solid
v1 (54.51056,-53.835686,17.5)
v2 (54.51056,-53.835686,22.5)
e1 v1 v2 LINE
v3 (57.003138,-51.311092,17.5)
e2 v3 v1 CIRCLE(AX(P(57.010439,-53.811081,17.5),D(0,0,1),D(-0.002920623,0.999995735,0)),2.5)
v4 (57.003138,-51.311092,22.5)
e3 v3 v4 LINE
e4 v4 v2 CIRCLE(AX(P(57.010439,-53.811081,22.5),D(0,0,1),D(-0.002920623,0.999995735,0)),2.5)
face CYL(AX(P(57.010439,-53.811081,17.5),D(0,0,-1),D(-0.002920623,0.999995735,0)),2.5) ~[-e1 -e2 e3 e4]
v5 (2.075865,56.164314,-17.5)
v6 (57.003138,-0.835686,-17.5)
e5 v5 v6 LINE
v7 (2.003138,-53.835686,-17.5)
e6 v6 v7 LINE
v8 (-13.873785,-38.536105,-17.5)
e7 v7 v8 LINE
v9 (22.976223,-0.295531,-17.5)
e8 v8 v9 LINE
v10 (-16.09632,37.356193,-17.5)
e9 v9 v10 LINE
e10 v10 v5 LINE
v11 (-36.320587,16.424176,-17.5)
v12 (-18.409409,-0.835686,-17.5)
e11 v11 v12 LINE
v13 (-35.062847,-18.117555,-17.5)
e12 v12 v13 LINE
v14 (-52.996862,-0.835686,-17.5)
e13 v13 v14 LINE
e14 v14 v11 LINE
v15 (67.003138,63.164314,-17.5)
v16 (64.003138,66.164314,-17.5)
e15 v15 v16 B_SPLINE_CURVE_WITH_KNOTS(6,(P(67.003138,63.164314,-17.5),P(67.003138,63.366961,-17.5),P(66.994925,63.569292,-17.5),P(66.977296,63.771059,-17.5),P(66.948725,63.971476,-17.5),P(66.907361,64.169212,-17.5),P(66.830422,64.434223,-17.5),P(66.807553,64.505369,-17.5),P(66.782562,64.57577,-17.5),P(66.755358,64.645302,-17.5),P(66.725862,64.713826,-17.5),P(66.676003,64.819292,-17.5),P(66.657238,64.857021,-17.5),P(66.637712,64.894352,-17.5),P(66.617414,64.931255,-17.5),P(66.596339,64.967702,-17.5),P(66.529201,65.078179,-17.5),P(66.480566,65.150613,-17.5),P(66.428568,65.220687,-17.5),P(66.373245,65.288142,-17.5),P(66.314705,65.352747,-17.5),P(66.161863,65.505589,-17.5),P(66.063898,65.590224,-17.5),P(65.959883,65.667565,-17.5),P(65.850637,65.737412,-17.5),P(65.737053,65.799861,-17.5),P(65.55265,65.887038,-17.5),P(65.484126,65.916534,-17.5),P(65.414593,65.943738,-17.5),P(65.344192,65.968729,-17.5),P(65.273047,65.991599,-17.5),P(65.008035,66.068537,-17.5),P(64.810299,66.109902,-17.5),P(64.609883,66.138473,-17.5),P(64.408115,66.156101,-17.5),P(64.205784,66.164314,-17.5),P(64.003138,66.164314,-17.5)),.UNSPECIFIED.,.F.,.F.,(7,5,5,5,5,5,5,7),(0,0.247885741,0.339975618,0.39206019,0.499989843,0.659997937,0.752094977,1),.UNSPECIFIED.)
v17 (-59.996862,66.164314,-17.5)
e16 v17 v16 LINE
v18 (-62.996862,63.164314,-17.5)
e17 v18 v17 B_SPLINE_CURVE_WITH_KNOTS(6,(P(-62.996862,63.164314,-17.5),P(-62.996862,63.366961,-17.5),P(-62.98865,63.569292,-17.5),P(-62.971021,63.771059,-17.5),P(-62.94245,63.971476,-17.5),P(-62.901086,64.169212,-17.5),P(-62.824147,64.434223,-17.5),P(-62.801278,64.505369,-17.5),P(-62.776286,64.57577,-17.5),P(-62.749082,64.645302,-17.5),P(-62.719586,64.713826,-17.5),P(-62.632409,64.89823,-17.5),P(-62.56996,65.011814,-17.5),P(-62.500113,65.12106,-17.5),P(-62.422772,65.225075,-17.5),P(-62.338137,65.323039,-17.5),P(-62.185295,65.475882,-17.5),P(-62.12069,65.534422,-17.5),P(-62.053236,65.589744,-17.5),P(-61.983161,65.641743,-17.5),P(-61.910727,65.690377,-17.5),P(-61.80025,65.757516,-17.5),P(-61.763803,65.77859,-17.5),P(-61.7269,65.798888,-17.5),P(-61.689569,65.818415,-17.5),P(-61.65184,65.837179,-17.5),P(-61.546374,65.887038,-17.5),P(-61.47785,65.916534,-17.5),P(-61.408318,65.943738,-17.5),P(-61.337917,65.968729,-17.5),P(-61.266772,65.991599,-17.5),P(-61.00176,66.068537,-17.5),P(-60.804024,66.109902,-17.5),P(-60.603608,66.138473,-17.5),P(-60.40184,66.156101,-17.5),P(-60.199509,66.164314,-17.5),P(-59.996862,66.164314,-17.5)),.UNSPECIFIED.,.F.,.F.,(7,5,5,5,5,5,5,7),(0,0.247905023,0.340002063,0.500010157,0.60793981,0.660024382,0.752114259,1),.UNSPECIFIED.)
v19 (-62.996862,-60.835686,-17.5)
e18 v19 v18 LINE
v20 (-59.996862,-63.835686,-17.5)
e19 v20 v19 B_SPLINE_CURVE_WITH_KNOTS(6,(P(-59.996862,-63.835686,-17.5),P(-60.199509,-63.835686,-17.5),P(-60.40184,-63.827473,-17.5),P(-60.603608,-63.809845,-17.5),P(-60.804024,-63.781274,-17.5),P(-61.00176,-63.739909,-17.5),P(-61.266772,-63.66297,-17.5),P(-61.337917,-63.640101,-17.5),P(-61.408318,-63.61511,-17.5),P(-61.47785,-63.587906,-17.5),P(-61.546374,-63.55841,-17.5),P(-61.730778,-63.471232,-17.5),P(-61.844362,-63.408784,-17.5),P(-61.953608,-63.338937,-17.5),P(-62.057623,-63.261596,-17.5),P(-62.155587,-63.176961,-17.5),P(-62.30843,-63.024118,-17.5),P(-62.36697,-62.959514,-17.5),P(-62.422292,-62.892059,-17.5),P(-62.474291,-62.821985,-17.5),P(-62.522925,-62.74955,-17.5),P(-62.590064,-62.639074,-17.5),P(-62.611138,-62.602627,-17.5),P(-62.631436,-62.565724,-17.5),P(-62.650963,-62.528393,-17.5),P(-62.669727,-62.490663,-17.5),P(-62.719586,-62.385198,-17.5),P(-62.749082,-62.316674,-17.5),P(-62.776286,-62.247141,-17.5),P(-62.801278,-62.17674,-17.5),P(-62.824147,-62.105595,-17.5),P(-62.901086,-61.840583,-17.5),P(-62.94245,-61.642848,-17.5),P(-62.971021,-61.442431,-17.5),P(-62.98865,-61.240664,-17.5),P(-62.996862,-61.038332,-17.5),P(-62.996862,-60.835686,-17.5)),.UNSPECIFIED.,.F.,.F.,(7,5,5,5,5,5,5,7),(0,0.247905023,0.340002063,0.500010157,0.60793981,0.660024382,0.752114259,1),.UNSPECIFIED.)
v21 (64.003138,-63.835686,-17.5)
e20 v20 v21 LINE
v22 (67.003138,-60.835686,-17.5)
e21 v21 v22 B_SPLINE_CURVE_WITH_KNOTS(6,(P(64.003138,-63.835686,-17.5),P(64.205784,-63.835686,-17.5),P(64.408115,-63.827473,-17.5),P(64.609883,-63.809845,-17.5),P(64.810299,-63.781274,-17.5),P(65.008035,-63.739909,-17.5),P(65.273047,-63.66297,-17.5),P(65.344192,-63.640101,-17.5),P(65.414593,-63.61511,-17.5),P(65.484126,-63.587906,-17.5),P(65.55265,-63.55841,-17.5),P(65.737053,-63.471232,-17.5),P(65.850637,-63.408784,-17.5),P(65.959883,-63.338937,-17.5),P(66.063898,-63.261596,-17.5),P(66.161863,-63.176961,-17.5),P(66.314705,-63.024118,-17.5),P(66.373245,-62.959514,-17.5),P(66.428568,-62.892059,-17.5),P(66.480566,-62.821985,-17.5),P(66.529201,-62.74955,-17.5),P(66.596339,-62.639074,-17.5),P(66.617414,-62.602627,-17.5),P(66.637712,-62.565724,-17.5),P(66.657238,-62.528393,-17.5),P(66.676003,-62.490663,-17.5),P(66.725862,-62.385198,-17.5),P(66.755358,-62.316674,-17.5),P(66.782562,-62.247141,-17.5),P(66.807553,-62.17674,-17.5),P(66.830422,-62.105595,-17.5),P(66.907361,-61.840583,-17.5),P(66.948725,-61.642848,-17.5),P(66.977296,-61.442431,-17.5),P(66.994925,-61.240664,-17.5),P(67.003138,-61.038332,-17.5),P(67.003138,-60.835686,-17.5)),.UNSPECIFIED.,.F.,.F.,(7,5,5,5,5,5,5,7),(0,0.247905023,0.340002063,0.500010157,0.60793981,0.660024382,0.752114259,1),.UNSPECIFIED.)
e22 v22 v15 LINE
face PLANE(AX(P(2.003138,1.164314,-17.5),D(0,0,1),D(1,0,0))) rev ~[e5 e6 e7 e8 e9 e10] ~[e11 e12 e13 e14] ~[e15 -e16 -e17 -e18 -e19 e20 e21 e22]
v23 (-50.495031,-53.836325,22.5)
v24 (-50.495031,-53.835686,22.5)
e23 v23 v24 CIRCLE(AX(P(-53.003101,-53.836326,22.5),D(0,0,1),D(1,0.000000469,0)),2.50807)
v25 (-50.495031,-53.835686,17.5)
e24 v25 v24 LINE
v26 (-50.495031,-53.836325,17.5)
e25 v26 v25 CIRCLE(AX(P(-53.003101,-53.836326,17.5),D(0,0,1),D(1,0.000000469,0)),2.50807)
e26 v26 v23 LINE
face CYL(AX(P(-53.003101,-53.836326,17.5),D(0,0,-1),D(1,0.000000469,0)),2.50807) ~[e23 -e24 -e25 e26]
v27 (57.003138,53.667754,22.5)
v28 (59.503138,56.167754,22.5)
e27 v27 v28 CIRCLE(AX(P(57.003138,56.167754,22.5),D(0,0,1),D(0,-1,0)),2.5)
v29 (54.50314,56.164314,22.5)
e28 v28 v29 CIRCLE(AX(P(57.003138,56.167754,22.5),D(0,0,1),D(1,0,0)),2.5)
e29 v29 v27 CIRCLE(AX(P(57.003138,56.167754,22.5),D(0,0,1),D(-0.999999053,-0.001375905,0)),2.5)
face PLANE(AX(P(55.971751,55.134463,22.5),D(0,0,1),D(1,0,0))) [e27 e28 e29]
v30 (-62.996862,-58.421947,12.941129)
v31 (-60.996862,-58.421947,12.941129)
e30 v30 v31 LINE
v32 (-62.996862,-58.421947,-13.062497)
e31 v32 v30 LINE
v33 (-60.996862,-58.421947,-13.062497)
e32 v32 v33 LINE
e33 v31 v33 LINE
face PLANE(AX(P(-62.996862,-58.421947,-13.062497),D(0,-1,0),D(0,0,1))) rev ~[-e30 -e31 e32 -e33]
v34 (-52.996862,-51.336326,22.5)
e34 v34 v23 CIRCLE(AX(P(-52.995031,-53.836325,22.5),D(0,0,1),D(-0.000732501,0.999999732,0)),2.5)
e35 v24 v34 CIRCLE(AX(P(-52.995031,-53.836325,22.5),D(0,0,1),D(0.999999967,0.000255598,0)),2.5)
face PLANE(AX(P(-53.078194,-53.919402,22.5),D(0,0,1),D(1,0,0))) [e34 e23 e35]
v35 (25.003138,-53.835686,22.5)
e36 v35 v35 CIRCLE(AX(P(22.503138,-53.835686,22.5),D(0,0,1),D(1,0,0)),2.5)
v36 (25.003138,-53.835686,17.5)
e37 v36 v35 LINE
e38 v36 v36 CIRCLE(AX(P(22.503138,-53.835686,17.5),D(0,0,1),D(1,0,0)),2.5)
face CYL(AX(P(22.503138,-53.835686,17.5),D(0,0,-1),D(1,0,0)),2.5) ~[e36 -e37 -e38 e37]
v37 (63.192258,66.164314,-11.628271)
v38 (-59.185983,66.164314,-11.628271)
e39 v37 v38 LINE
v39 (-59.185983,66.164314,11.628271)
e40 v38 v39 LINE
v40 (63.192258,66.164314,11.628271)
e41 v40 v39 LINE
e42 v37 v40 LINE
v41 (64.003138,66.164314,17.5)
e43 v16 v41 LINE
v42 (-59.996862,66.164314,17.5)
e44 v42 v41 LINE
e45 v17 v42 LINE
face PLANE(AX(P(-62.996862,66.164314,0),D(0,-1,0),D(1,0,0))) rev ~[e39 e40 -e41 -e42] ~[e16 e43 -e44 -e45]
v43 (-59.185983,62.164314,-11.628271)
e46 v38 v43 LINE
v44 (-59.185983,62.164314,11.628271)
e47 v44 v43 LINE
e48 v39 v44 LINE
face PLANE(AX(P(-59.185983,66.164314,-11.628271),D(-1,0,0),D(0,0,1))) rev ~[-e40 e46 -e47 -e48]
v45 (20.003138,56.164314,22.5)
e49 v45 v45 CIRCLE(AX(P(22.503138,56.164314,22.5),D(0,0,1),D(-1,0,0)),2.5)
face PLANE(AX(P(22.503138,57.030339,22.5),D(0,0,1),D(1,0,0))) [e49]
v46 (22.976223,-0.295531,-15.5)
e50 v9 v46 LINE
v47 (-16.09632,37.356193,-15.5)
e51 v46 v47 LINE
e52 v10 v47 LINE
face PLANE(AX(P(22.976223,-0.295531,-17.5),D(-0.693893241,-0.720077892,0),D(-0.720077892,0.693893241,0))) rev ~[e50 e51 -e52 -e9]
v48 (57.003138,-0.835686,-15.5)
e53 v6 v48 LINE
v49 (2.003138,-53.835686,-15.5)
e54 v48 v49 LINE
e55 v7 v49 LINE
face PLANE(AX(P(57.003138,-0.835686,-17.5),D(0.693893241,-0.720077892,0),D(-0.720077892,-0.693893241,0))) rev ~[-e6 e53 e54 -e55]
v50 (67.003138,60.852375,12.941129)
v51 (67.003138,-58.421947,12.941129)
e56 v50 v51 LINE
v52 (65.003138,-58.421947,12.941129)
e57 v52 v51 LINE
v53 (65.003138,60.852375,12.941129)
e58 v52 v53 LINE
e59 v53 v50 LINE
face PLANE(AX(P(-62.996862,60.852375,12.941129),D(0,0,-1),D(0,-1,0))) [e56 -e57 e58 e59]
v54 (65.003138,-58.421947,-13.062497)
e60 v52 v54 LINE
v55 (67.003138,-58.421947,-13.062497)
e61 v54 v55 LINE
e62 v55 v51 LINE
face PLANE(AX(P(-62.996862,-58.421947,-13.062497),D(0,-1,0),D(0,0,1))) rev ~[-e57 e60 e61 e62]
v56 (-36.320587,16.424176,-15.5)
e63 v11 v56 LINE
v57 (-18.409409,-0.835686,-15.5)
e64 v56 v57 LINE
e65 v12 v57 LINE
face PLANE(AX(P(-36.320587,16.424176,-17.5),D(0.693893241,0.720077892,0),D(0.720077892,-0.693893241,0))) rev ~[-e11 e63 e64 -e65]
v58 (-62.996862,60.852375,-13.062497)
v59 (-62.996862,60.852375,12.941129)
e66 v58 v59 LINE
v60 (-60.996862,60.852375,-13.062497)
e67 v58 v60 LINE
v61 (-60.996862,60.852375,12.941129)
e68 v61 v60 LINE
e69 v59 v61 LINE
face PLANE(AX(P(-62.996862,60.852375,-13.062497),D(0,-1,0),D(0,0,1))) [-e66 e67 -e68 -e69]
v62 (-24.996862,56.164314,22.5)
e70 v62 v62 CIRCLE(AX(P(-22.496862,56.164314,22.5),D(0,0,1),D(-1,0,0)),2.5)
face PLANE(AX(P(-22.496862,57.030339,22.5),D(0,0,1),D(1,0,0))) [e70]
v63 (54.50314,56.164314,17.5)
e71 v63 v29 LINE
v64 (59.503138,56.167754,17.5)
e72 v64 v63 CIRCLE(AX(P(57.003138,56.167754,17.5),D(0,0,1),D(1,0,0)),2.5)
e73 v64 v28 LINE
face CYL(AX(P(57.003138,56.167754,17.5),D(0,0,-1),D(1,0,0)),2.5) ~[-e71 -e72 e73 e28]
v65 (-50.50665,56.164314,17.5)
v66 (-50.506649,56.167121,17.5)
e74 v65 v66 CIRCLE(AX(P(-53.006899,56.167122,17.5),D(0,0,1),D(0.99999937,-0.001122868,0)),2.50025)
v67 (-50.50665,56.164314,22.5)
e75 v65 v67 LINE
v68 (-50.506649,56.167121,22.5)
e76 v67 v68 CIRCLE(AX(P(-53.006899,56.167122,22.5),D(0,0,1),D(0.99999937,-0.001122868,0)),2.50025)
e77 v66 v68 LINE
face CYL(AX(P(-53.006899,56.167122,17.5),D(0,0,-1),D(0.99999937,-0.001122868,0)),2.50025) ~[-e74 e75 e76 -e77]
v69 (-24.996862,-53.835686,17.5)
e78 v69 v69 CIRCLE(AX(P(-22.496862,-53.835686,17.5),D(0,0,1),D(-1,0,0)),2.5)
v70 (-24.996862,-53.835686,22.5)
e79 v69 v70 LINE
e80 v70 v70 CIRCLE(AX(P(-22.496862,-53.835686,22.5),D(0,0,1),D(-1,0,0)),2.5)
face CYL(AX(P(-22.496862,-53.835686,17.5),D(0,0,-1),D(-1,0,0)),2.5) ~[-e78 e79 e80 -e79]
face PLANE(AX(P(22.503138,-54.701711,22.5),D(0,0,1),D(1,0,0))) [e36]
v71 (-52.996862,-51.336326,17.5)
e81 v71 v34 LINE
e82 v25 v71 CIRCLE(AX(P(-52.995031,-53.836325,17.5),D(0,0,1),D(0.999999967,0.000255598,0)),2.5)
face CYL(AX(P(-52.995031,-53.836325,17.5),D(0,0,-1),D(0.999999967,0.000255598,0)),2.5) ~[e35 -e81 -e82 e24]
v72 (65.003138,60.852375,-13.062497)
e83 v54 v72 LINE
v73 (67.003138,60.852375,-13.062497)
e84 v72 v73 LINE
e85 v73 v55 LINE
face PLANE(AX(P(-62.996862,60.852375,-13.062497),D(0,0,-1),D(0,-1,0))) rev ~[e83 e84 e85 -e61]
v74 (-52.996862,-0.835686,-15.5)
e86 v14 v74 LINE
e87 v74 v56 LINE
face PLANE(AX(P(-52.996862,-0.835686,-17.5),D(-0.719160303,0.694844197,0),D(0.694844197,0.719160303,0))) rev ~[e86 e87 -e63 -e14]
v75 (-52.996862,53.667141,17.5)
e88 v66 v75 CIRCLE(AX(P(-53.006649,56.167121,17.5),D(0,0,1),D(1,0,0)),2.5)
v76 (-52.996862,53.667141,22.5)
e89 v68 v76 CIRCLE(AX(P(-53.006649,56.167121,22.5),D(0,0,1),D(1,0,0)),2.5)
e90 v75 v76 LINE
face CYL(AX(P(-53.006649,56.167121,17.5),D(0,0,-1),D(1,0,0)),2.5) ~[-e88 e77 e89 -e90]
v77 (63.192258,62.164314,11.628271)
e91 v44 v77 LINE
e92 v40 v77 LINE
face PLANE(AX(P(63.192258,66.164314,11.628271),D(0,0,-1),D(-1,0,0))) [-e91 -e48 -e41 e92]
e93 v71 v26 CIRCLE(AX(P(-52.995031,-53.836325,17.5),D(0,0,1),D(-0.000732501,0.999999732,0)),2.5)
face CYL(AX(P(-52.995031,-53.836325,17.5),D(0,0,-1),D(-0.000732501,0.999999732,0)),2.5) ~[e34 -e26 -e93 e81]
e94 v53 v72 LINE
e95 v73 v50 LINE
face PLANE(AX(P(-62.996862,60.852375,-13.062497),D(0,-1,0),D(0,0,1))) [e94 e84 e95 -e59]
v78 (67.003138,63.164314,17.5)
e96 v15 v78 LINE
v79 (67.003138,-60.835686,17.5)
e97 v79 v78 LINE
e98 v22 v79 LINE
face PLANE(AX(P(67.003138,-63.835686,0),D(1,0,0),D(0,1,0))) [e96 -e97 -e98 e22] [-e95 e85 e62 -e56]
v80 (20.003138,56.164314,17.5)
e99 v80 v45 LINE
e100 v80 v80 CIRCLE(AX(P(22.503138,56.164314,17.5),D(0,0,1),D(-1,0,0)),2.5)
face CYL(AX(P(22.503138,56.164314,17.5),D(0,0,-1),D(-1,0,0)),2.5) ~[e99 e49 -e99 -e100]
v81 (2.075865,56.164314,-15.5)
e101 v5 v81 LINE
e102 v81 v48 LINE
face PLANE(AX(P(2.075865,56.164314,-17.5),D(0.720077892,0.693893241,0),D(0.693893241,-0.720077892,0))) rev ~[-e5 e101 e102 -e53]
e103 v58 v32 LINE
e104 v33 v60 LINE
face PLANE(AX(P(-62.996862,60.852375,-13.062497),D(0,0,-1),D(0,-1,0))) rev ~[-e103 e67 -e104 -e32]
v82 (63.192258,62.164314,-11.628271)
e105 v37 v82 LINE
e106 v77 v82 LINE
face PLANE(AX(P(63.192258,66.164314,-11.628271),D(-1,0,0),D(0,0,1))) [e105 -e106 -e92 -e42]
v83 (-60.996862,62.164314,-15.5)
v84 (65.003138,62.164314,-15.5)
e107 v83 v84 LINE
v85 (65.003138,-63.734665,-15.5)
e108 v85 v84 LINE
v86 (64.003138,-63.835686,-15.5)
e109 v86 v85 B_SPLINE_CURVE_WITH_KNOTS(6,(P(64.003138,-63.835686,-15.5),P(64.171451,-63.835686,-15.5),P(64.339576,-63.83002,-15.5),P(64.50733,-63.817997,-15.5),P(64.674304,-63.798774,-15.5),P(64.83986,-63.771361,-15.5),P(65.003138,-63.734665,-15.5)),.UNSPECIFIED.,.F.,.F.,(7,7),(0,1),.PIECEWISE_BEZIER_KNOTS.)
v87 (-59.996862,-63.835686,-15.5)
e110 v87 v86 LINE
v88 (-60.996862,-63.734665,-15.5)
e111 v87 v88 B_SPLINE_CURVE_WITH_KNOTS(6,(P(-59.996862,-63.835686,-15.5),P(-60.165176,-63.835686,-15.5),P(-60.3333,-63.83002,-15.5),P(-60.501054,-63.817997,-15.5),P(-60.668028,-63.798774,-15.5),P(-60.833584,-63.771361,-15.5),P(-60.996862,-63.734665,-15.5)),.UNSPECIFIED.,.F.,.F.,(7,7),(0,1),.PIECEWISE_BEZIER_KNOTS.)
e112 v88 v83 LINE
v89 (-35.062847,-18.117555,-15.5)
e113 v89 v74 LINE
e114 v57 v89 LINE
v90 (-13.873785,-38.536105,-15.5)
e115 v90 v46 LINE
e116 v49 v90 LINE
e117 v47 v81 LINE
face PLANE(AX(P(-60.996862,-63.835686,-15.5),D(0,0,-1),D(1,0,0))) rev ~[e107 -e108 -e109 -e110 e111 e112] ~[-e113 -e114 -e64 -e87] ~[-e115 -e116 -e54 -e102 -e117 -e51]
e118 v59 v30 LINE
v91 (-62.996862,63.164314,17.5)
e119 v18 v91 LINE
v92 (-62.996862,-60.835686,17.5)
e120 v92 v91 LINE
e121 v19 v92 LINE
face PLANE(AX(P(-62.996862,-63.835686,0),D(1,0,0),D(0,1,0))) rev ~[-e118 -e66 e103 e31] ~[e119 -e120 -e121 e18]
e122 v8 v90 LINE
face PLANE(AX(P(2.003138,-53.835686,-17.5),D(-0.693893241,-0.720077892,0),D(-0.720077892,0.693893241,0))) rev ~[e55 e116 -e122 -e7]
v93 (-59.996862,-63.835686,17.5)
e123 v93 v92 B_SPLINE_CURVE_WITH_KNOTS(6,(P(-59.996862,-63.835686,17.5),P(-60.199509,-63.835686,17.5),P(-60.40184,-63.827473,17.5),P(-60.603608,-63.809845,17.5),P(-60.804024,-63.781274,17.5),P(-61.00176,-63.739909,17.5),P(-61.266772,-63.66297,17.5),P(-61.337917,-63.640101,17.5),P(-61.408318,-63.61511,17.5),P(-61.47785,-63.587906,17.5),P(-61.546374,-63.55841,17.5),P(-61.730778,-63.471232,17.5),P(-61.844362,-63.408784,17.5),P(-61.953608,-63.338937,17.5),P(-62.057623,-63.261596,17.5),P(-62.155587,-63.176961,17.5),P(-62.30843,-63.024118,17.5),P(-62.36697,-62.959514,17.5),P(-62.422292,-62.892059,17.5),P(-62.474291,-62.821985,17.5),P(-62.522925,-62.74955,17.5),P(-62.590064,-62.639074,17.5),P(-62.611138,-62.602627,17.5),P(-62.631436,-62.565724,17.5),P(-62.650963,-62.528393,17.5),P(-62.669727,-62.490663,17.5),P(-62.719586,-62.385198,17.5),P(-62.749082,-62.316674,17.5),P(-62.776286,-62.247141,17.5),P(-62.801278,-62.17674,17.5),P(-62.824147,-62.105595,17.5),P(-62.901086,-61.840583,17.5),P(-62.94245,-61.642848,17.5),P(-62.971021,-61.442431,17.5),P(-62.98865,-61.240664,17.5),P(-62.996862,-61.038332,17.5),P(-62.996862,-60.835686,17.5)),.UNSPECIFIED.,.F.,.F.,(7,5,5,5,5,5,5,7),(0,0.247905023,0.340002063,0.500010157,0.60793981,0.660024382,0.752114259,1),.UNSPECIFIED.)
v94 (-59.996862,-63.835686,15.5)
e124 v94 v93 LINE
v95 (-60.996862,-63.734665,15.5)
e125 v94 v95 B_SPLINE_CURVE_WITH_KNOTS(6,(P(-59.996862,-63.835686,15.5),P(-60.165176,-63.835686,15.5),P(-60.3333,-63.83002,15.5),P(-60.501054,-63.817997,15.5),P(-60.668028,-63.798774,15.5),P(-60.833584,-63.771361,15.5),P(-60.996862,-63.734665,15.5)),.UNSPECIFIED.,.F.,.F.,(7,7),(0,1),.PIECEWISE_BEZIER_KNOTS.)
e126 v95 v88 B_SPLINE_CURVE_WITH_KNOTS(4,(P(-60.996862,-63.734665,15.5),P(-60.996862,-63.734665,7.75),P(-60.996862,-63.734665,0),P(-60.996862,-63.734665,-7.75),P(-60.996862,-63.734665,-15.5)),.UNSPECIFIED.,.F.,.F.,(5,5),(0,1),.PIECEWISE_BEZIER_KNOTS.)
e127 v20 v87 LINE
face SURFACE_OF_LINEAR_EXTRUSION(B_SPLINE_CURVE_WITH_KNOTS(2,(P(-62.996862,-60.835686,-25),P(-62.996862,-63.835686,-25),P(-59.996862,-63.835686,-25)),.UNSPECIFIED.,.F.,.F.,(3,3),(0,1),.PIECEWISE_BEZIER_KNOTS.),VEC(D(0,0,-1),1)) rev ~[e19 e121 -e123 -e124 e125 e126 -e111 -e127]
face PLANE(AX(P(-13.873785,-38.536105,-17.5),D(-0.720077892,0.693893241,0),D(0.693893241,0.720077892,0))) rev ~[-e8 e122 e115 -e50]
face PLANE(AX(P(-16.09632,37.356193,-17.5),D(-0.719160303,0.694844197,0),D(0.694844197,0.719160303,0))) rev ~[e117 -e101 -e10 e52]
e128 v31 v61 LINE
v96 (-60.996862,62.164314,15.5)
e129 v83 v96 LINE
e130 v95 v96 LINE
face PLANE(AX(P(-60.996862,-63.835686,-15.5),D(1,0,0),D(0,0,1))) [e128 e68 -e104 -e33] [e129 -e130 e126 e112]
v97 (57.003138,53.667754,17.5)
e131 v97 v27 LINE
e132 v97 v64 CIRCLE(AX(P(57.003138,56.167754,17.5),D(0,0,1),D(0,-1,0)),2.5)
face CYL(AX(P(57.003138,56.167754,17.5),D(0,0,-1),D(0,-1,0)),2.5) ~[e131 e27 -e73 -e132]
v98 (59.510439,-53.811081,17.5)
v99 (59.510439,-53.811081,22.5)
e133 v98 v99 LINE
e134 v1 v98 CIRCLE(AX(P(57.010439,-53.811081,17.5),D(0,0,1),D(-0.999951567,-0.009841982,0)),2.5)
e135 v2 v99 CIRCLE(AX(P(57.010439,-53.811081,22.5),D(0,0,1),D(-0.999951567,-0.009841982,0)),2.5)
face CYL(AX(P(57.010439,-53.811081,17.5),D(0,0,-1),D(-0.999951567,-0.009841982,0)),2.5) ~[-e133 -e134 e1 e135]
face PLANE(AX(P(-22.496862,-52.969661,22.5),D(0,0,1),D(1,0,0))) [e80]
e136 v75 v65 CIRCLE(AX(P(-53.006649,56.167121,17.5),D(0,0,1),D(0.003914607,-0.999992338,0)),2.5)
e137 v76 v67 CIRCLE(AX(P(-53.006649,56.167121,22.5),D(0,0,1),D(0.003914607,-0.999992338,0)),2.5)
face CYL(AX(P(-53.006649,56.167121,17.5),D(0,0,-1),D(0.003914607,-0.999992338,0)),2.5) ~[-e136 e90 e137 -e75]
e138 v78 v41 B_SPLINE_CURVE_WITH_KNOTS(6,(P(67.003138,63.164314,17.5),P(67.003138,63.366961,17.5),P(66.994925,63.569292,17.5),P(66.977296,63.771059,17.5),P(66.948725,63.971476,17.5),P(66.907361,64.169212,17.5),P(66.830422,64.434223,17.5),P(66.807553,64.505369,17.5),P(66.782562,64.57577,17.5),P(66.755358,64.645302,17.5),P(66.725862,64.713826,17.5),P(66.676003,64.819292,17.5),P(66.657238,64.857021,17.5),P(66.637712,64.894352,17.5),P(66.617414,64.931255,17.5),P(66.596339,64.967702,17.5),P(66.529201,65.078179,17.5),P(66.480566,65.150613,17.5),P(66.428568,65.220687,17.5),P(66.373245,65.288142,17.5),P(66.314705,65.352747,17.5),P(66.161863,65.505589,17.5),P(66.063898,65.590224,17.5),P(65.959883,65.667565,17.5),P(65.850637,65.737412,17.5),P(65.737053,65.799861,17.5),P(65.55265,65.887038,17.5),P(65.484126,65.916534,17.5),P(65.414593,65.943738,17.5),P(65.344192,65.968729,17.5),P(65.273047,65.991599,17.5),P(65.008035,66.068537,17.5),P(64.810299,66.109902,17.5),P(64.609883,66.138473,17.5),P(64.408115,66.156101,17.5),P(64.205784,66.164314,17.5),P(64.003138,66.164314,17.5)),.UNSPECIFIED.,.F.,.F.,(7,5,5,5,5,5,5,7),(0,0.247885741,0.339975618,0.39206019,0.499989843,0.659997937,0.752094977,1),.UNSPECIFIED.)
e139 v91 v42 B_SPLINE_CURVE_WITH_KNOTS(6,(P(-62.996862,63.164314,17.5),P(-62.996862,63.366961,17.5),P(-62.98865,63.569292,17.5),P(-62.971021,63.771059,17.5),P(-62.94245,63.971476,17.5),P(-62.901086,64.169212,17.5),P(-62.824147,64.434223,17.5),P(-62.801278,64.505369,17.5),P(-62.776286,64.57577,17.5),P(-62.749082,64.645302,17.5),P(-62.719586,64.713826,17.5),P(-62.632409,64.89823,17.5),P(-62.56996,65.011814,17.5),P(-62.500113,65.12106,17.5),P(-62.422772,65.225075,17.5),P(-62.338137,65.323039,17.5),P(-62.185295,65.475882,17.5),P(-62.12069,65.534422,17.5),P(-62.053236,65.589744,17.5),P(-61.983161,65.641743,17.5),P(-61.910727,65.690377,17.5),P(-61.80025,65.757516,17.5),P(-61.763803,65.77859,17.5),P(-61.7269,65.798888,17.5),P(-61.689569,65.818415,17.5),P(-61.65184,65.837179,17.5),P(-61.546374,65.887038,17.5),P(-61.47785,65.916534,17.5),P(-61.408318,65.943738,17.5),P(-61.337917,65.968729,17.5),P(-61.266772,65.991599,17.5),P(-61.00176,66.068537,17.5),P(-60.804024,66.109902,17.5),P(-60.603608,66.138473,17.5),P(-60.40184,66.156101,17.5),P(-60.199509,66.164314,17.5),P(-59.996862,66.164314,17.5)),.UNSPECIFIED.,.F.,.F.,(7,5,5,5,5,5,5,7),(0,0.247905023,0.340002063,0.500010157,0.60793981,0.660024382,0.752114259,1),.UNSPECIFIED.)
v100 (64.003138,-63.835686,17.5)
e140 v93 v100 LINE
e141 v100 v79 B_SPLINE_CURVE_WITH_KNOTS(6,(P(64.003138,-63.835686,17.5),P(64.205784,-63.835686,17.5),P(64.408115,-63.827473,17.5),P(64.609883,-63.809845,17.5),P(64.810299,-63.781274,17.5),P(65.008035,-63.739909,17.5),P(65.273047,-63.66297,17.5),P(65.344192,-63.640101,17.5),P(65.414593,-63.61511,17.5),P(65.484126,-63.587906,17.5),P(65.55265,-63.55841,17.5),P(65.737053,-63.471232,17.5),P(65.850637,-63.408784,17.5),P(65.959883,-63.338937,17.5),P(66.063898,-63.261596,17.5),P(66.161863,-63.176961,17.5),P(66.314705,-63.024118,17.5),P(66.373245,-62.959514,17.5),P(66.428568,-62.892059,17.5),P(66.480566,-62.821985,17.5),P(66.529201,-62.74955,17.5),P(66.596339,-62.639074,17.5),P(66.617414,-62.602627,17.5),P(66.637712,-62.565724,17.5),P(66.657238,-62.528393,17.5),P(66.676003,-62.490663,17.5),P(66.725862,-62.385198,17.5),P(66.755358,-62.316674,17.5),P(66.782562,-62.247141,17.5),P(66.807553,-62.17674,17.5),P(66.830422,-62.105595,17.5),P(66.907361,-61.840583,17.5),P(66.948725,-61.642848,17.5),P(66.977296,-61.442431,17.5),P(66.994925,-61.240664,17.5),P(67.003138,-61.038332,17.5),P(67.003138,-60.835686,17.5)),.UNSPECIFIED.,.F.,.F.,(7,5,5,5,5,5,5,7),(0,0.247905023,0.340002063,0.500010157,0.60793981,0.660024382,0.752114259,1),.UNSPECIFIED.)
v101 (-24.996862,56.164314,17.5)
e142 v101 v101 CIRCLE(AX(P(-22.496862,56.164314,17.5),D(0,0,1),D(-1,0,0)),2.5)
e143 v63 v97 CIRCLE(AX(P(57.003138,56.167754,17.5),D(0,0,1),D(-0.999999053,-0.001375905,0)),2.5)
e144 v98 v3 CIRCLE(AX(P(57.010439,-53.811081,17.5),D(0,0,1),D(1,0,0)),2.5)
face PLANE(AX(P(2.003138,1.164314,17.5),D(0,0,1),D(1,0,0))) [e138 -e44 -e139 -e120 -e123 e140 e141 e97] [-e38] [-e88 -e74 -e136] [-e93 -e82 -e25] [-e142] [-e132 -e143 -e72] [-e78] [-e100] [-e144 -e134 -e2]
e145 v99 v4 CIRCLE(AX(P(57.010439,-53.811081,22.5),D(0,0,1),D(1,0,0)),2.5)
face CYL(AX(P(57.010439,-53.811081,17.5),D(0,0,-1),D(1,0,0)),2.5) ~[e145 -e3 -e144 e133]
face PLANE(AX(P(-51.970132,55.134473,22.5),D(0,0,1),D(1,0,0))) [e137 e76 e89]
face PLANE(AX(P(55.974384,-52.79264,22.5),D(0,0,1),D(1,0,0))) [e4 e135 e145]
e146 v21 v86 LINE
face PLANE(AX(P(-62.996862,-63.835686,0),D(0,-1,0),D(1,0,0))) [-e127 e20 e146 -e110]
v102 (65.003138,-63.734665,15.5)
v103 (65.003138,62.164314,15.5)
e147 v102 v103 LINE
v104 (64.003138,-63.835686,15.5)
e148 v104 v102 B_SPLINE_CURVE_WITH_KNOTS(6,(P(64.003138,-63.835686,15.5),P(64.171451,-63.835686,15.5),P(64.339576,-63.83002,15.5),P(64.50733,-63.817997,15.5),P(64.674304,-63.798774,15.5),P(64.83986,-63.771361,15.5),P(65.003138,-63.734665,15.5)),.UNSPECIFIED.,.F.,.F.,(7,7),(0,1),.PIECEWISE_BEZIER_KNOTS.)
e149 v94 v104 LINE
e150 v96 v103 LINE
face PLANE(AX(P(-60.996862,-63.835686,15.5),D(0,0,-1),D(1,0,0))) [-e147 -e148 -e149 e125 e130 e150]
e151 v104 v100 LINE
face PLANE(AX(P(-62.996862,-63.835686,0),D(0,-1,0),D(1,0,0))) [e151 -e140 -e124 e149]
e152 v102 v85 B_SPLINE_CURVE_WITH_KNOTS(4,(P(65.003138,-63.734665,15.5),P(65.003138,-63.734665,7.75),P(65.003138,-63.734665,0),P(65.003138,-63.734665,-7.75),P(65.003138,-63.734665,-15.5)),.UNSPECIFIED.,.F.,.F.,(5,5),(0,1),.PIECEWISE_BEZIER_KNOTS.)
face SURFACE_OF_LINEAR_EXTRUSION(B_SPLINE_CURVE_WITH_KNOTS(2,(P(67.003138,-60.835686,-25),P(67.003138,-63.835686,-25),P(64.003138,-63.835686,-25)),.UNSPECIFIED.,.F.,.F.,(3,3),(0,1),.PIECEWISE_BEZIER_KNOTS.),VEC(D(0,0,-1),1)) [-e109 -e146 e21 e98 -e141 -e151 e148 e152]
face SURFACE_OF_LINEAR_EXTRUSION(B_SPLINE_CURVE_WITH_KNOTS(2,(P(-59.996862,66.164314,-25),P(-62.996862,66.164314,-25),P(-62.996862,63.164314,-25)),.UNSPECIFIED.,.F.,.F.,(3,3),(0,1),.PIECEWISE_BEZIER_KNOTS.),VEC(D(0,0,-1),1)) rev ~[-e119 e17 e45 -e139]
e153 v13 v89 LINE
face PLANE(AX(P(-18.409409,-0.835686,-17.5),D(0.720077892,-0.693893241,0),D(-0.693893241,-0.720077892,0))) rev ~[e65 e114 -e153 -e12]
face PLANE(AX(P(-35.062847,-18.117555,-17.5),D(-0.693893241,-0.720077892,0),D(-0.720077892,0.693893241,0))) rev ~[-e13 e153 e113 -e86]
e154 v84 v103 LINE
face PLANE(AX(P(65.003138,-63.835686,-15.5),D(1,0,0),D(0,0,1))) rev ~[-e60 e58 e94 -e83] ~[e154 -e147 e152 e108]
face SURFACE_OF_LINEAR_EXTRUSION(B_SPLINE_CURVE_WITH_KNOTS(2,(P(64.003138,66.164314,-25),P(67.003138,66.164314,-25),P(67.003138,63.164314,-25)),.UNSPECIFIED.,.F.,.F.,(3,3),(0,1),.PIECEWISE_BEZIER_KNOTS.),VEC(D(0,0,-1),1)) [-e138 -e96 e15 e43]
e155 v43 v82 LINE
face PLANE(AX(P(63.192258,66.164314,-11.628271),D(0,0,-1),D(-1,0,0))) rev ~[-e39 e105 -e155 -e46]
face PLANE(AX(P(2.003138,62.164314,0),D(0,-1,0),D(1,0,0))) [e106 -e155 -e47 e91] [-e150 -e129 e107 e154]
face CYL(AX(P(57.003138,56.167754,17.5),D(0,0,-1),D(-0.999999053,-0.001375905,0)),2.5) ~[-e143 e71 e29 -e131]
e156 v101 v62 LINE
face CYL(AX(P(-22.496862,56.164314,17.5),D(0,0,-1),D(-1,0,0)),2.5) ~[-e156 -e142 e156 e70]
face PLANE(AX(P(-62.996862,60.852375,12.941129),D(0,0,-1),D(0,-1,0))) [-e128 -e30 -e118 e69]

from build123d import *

# Parameters (mm, degrees)
F0_W         = 130
F0_H         = 130
F1_DEPTH     = 17.5
F2_W         = 126
F2_H         = 31
F3_DEPTH     = 126
F5_DEPTH     = 5
F7_DEPTH     = 3
F9_W         = 122.3782406645
F9_H         = 23.2565429012
F10_DEPTH    = 7
F8_W         = 119.2743226562
F8_H         = 26.0036256061
F11_DEPTH    = 130
F12_T1_DEPTH = 50


# Not quite as in the source:
# - a fillet or chamfer that OpenCascade refuses, or shapes differently, is made with other operations: its cross-section is extruded or revolved along the edge and cut away or added


with BuildPart() as f1:
    # F0 (on Top) → F1 (new body, symmetric)
    with BuildSketch(Plane.XY):
        with Locations((2.0031377077, 1.1643140912)):
            Rectangle(F0_W, F0_H)
    extrude(amount=F1_DEPTH, both=True)

    # F2 (on face) → F3 (cut)
    with BuildSketch(Plane.XZ.offset(63.8356859088)):
        with Locations((2.0031377077, 0)):
            Rectangle(F2_W, F2_H)
    extrude(amount=-F3_DEPTH, mode=Mode.SUBTRACT)

    # F4 (on face) → F5 (join)
    with BuildSketch(Plane.XY.offset(17.5)):
        with BuildLine():
            Line((-24.9968622923, -53.8356859088), (-19.9968622923, -53.8356859088))
            ThreePointArc((-19.9968622923, -53.8356859088), (-22.4968622923, -51.3356859088), (-24.9968622923, -53.8356859088))
        make_face()
        with BuildLine():
            ThreePointArc((-24.9968622923, -53.8356859088), (-22.4968622923, -56.3356859088), (-19.9968622923, -53.8356859088))
            Line((-19.9968622923, -53.8356859088), (-24.9968622923, -53.8356859088))
        make_face()
        with BuildLine():
            ThreePointArc((-19.9968622923, 56.1643140912), (-22.4968622923, 58.6643140912), (-24.9968622923, 56.1643140912))
            Line((-24.9968622923, 56.1643140912), (-19.9968622923, 56.1643140912))
        make_face()
        with BuildLine():
            Line((-19.9968622923, 56.1643140912), (-24.9968622923, 56.1643140912))
            ThreePointArc((-24.9968622923, 56.1643140912), (-22.4968622923, 53.6643140912), (-19.9968622923, 56.1643140912))
        make_face()
        with BuildLine():
            Line((20.0031377077, 56.1643140912), (25.0031377077, 56.1643140912))
            ThreePointArc((25.0031377077, 56.1643140912), (22.5031377077, 58.6643140912), (20.0031377077, 56.1643140912))
        make_face()
        with BuildLine():
            ThreePointArc((20.0031377077, 56.1643140912), (22.5031377077, 53.6643140912), (25.0031377077, 56.1643140912))
            Line((25.0031377077, 56.1643140912), (20.0031377077, 56.1643140912))
        make_face()
        with BuildLine():
            Line((25.0031377077, -53.8356859088), (20.0031377077, -53.8356859088))
            ThreePointArc((20.0031377077, -53.8356859088), (22.5031377077, -56.3356859088), (25.0031377077, -53.8356859088))
        make_face()
        with BuildLine():
            ThreePointArc((25.0031377077, -53.8356859088), (22.5031377077, -51.3356859088), (20.0031377077, -53.8356859088))
            Line((20.0031377077, -53.8356859088), (25.0031377077, -53.8356859088))
        make_face()
        with BuildLine():
            ThreePointArc((54.5031400741, 56.1643140912), (55.2365873133, 54.3987711796), (57.0031377077, 53.6677538545))
            Line((57.0031377077, 53.6677538545), (57.0031377077, 56.1643140912))
            Line((57.0031377077, 56.1643140912), (54.5031400741, 56.1643140912))
        make_face()
        with BuildLine():
            Line((57.0031377077, 56.1643140912), (57.0031377077, 53.6677538545))
            ThreePointArc((57.0031377077, 53.6677538545), (58.7709046607, 54.3999869016), (59.5031377077, 56.1677538545))
            ThreePointArc((59.5031377077, 56.1677538545), (57.0014178256, 58.6677532629), (54.5031400741, 56.1643140912))
            Line((54.5031400741, 56.1643140912), (57.0031377077, 56.1643140912))
        make_face()
        with BuildLine():
            ThreePointArc((57.0031377077, -51.3110916167), (55.2314275833, -52.0546307181), (54.51056035, -53.8356859088))
            Line((54.51056035, -53.8356859088), (57.0031377077, -53.8356859088))
            Line((57.0031377077, -53.8356859088), (57.0031377077, -51.3110916167))
        make_face()
        with BuildLine():
            Line((57.0031377077, -53.8356859088), (54.51056035, -53.8356859088))
            ThreePointArc((54.51056035, -53.8356859088), (57.0227418926, -56.311050683), (59.5104392663, -53.8110809541))
            ThreePointArc((59.5104392663, -53.8110809541), (58.7756228408, -52.0407343925), (57.0031377077, -51.3110916167))
            Line((57.0031377077, -51.3110916167), (57.0031377077, -53.8356859088))
        make_face()
        with BuildLine():
            ThreePointArc((-50.4950310388, -53.8363249032), (-50.4950310593, -53.836005406), (-50.4950311205, -53.8356859088))
            Line((-50.4950311205, -53.8356859088), (-52.9968622923, -53.8356859088))
            Line((-52.9968622923, -53.8356859088), (-52.9968622923, -51.3363255739))
            ThreePointArc((-52.9968622923, -51.3363255739), (-54.7621504273, -55.6047391835), (-50.4950310388, -53.8363249032))
        make_face()
        with BuildLine():
            Line((-52.9968622923, -53.8356859088), (-50.4950311205, -53.8356859088))
            ThreePointArc((-50.4950311205, -53.8356859088), (-51.2281376662, -52.0676848015), (-52.9968622923, -51.3363255739))
            Line((-52.9968622923, -51.3363255739), (-52.9968622923, -53.8356859088))
        make_face()
        with BuildLine():
            Line((-52.9968622923, 56.1643140912), (-52.9968622923, 53.6671405204))
            ThreePointArc((-52.9968622923, 53.6671405204), (-51.2364160366, 54.4018236777), (-50.506650387, 56.1643140912))
            Line((-50.506650387, 56.1643140912), (-52.9968622923, 56.1643140912))
        make_face()
        with BuildLine():
            ThreePointArc((-50.5066488108, 56.1671213651), (-54.777872441, 57.9314248684), (-52.9968622923, 53.6671405204))
            Line((-52.9968622923, 53.6671405204), (-52.9968622923, 56.1643140912))
            Line((-52.9968622923, 56.1643140912), (-50.506650387, 56.1643140912))
            ThreePointArc((-50.506650387, 56.1643140912), (-50.5066492049, 56.1657177279), (-50.5066488108, 56.1671213651))
        make_face()
    extrude(amount=F5_DEPTH)

    # F6 (on face) → F7 (cut)
    with BuildSketch(Plane(origin=(0, 0, -17.5), x_dir=(1, 0, 0), z_dir=(0, 0, -1))):
        Polygon((57.0031377077, 0.8356859088), (2.0031377077, 53.8356859088), (-13.8737854376, 38.5361054233), (22.9762229292, 0.2955307031), (-16.0963200722, -37.3561925527), (2.0758649804, -56.1643140912), align=None)
        Polygon((-35.0628468777, 18.1175553083), (-52.9968622923, 0.8356859088), (-36.3205869987, -16.424176437), (-18.4094090927, 0.8356859088), align=None)
    extrude(amount=-F7_DEPTH, mode=Mode.SUBTRACT)

    # F9 (on face) → F10 (cut)
    with BuildSketch(Plane(origin=(0, 66.1643140912, 0), x_dir=(-1, 0, 0), z_dir=(0, 1, 0))):
        with Locations((-2.0031377077, 0)):
            Rectangle(F9_W, F9_H)
    extrude(amount=-F10_DEPTH, mode=Mode.SUBTRACT)

    # F8 (on face) → F11 (cut)
    with BuildSketch(Plane(origin=(-62.9968622923, 0, 0), x_dir=(0, -1, 0), z_dir=(-1, 0, 0))):
        with Locations((-1.2152138836, -0.0606838628)):
            Rectangle(F8_W, F8_H)
    extrude(amount=-F11_DEPTH, mode=Mode.SUBTRACT)

    # F12: fillet of radius 3 on 4 edges, made by hand

    # F12_s2 → F12_t1 (cut)
    with BuildSketch(Plane.XY.offset(-25)):
        with BuildLine():
            add(Edge.make_bspline(
                [(-59.9968622923, 66.1643140912), (-62.9968622923, 66.1643140912), (-62.9968622923, 63.1643140912)],
                knots=[0, 0, 0, 1, 1, 1], degree=2, weights=[1, 1, 1]))
            Line((-62.9968622923, 63.1643140912), (-62.9968622923, 66.1643140912))
            Line((-62.9968622923, 66.1643140912), (-59.9968622923, 66.1643140912))
        make_face()
        with BuildLine():
            add(Edge.make_bspline(
                [(-62.9968622923, -60.8356859088), (-62.9968622923, -63.8356859088), (-59.9968622923, -63.8356859088)],
                knots=[0, 0, 0, 1, 1, 1], degree=2, weights=[1, 1, 1]))
            Line((-59.9968622923, -63.8356859088), (-62.9968622923, -63.8356859088))
            Line((-62.9968622923, -63.8356859088), (-62.9968622923, -60.8356859088))
        make_face()
        with BuildLine():
            add(Edge.make_bspline(
                [(64.0031377077, 66.1643140912), (67.0031377077, 66.1643140912), (67.0031377077, 63.1643140912)],
                knots=[0, 0, 0, 1, 1, 1], degree=2, weights=[1, 1, 1]))
            Line((67.0031377077, 63.1643140912), (67.0031377077, 66.1643140912))
            Line((67.0031377077, 66.1643140912), (64.0031377077, 66.1643140912))
        make_face()
        with BuildLine():
            add(Edge.make_bspline(
                [(67.0031377077, -60.8356859088), (67.0031377077, -63.8356859088), (64.0031377077, -63.8356859088)],
                knots=[0, 0, 0, 1, 1, 1], degree=2, weights=[1, 1, 1]))
            Line((64.0031377077, -63.8356859088), (67.0031377077, -63.8356859088))
            Line((67.0031377077, -63.8356859088), (67.0031377077, -60.8356859088))
        make_face()
    extrude(amount=F12_T1_DEPTH, mode=Mode.SUBTRACT)


solid = f1.part
